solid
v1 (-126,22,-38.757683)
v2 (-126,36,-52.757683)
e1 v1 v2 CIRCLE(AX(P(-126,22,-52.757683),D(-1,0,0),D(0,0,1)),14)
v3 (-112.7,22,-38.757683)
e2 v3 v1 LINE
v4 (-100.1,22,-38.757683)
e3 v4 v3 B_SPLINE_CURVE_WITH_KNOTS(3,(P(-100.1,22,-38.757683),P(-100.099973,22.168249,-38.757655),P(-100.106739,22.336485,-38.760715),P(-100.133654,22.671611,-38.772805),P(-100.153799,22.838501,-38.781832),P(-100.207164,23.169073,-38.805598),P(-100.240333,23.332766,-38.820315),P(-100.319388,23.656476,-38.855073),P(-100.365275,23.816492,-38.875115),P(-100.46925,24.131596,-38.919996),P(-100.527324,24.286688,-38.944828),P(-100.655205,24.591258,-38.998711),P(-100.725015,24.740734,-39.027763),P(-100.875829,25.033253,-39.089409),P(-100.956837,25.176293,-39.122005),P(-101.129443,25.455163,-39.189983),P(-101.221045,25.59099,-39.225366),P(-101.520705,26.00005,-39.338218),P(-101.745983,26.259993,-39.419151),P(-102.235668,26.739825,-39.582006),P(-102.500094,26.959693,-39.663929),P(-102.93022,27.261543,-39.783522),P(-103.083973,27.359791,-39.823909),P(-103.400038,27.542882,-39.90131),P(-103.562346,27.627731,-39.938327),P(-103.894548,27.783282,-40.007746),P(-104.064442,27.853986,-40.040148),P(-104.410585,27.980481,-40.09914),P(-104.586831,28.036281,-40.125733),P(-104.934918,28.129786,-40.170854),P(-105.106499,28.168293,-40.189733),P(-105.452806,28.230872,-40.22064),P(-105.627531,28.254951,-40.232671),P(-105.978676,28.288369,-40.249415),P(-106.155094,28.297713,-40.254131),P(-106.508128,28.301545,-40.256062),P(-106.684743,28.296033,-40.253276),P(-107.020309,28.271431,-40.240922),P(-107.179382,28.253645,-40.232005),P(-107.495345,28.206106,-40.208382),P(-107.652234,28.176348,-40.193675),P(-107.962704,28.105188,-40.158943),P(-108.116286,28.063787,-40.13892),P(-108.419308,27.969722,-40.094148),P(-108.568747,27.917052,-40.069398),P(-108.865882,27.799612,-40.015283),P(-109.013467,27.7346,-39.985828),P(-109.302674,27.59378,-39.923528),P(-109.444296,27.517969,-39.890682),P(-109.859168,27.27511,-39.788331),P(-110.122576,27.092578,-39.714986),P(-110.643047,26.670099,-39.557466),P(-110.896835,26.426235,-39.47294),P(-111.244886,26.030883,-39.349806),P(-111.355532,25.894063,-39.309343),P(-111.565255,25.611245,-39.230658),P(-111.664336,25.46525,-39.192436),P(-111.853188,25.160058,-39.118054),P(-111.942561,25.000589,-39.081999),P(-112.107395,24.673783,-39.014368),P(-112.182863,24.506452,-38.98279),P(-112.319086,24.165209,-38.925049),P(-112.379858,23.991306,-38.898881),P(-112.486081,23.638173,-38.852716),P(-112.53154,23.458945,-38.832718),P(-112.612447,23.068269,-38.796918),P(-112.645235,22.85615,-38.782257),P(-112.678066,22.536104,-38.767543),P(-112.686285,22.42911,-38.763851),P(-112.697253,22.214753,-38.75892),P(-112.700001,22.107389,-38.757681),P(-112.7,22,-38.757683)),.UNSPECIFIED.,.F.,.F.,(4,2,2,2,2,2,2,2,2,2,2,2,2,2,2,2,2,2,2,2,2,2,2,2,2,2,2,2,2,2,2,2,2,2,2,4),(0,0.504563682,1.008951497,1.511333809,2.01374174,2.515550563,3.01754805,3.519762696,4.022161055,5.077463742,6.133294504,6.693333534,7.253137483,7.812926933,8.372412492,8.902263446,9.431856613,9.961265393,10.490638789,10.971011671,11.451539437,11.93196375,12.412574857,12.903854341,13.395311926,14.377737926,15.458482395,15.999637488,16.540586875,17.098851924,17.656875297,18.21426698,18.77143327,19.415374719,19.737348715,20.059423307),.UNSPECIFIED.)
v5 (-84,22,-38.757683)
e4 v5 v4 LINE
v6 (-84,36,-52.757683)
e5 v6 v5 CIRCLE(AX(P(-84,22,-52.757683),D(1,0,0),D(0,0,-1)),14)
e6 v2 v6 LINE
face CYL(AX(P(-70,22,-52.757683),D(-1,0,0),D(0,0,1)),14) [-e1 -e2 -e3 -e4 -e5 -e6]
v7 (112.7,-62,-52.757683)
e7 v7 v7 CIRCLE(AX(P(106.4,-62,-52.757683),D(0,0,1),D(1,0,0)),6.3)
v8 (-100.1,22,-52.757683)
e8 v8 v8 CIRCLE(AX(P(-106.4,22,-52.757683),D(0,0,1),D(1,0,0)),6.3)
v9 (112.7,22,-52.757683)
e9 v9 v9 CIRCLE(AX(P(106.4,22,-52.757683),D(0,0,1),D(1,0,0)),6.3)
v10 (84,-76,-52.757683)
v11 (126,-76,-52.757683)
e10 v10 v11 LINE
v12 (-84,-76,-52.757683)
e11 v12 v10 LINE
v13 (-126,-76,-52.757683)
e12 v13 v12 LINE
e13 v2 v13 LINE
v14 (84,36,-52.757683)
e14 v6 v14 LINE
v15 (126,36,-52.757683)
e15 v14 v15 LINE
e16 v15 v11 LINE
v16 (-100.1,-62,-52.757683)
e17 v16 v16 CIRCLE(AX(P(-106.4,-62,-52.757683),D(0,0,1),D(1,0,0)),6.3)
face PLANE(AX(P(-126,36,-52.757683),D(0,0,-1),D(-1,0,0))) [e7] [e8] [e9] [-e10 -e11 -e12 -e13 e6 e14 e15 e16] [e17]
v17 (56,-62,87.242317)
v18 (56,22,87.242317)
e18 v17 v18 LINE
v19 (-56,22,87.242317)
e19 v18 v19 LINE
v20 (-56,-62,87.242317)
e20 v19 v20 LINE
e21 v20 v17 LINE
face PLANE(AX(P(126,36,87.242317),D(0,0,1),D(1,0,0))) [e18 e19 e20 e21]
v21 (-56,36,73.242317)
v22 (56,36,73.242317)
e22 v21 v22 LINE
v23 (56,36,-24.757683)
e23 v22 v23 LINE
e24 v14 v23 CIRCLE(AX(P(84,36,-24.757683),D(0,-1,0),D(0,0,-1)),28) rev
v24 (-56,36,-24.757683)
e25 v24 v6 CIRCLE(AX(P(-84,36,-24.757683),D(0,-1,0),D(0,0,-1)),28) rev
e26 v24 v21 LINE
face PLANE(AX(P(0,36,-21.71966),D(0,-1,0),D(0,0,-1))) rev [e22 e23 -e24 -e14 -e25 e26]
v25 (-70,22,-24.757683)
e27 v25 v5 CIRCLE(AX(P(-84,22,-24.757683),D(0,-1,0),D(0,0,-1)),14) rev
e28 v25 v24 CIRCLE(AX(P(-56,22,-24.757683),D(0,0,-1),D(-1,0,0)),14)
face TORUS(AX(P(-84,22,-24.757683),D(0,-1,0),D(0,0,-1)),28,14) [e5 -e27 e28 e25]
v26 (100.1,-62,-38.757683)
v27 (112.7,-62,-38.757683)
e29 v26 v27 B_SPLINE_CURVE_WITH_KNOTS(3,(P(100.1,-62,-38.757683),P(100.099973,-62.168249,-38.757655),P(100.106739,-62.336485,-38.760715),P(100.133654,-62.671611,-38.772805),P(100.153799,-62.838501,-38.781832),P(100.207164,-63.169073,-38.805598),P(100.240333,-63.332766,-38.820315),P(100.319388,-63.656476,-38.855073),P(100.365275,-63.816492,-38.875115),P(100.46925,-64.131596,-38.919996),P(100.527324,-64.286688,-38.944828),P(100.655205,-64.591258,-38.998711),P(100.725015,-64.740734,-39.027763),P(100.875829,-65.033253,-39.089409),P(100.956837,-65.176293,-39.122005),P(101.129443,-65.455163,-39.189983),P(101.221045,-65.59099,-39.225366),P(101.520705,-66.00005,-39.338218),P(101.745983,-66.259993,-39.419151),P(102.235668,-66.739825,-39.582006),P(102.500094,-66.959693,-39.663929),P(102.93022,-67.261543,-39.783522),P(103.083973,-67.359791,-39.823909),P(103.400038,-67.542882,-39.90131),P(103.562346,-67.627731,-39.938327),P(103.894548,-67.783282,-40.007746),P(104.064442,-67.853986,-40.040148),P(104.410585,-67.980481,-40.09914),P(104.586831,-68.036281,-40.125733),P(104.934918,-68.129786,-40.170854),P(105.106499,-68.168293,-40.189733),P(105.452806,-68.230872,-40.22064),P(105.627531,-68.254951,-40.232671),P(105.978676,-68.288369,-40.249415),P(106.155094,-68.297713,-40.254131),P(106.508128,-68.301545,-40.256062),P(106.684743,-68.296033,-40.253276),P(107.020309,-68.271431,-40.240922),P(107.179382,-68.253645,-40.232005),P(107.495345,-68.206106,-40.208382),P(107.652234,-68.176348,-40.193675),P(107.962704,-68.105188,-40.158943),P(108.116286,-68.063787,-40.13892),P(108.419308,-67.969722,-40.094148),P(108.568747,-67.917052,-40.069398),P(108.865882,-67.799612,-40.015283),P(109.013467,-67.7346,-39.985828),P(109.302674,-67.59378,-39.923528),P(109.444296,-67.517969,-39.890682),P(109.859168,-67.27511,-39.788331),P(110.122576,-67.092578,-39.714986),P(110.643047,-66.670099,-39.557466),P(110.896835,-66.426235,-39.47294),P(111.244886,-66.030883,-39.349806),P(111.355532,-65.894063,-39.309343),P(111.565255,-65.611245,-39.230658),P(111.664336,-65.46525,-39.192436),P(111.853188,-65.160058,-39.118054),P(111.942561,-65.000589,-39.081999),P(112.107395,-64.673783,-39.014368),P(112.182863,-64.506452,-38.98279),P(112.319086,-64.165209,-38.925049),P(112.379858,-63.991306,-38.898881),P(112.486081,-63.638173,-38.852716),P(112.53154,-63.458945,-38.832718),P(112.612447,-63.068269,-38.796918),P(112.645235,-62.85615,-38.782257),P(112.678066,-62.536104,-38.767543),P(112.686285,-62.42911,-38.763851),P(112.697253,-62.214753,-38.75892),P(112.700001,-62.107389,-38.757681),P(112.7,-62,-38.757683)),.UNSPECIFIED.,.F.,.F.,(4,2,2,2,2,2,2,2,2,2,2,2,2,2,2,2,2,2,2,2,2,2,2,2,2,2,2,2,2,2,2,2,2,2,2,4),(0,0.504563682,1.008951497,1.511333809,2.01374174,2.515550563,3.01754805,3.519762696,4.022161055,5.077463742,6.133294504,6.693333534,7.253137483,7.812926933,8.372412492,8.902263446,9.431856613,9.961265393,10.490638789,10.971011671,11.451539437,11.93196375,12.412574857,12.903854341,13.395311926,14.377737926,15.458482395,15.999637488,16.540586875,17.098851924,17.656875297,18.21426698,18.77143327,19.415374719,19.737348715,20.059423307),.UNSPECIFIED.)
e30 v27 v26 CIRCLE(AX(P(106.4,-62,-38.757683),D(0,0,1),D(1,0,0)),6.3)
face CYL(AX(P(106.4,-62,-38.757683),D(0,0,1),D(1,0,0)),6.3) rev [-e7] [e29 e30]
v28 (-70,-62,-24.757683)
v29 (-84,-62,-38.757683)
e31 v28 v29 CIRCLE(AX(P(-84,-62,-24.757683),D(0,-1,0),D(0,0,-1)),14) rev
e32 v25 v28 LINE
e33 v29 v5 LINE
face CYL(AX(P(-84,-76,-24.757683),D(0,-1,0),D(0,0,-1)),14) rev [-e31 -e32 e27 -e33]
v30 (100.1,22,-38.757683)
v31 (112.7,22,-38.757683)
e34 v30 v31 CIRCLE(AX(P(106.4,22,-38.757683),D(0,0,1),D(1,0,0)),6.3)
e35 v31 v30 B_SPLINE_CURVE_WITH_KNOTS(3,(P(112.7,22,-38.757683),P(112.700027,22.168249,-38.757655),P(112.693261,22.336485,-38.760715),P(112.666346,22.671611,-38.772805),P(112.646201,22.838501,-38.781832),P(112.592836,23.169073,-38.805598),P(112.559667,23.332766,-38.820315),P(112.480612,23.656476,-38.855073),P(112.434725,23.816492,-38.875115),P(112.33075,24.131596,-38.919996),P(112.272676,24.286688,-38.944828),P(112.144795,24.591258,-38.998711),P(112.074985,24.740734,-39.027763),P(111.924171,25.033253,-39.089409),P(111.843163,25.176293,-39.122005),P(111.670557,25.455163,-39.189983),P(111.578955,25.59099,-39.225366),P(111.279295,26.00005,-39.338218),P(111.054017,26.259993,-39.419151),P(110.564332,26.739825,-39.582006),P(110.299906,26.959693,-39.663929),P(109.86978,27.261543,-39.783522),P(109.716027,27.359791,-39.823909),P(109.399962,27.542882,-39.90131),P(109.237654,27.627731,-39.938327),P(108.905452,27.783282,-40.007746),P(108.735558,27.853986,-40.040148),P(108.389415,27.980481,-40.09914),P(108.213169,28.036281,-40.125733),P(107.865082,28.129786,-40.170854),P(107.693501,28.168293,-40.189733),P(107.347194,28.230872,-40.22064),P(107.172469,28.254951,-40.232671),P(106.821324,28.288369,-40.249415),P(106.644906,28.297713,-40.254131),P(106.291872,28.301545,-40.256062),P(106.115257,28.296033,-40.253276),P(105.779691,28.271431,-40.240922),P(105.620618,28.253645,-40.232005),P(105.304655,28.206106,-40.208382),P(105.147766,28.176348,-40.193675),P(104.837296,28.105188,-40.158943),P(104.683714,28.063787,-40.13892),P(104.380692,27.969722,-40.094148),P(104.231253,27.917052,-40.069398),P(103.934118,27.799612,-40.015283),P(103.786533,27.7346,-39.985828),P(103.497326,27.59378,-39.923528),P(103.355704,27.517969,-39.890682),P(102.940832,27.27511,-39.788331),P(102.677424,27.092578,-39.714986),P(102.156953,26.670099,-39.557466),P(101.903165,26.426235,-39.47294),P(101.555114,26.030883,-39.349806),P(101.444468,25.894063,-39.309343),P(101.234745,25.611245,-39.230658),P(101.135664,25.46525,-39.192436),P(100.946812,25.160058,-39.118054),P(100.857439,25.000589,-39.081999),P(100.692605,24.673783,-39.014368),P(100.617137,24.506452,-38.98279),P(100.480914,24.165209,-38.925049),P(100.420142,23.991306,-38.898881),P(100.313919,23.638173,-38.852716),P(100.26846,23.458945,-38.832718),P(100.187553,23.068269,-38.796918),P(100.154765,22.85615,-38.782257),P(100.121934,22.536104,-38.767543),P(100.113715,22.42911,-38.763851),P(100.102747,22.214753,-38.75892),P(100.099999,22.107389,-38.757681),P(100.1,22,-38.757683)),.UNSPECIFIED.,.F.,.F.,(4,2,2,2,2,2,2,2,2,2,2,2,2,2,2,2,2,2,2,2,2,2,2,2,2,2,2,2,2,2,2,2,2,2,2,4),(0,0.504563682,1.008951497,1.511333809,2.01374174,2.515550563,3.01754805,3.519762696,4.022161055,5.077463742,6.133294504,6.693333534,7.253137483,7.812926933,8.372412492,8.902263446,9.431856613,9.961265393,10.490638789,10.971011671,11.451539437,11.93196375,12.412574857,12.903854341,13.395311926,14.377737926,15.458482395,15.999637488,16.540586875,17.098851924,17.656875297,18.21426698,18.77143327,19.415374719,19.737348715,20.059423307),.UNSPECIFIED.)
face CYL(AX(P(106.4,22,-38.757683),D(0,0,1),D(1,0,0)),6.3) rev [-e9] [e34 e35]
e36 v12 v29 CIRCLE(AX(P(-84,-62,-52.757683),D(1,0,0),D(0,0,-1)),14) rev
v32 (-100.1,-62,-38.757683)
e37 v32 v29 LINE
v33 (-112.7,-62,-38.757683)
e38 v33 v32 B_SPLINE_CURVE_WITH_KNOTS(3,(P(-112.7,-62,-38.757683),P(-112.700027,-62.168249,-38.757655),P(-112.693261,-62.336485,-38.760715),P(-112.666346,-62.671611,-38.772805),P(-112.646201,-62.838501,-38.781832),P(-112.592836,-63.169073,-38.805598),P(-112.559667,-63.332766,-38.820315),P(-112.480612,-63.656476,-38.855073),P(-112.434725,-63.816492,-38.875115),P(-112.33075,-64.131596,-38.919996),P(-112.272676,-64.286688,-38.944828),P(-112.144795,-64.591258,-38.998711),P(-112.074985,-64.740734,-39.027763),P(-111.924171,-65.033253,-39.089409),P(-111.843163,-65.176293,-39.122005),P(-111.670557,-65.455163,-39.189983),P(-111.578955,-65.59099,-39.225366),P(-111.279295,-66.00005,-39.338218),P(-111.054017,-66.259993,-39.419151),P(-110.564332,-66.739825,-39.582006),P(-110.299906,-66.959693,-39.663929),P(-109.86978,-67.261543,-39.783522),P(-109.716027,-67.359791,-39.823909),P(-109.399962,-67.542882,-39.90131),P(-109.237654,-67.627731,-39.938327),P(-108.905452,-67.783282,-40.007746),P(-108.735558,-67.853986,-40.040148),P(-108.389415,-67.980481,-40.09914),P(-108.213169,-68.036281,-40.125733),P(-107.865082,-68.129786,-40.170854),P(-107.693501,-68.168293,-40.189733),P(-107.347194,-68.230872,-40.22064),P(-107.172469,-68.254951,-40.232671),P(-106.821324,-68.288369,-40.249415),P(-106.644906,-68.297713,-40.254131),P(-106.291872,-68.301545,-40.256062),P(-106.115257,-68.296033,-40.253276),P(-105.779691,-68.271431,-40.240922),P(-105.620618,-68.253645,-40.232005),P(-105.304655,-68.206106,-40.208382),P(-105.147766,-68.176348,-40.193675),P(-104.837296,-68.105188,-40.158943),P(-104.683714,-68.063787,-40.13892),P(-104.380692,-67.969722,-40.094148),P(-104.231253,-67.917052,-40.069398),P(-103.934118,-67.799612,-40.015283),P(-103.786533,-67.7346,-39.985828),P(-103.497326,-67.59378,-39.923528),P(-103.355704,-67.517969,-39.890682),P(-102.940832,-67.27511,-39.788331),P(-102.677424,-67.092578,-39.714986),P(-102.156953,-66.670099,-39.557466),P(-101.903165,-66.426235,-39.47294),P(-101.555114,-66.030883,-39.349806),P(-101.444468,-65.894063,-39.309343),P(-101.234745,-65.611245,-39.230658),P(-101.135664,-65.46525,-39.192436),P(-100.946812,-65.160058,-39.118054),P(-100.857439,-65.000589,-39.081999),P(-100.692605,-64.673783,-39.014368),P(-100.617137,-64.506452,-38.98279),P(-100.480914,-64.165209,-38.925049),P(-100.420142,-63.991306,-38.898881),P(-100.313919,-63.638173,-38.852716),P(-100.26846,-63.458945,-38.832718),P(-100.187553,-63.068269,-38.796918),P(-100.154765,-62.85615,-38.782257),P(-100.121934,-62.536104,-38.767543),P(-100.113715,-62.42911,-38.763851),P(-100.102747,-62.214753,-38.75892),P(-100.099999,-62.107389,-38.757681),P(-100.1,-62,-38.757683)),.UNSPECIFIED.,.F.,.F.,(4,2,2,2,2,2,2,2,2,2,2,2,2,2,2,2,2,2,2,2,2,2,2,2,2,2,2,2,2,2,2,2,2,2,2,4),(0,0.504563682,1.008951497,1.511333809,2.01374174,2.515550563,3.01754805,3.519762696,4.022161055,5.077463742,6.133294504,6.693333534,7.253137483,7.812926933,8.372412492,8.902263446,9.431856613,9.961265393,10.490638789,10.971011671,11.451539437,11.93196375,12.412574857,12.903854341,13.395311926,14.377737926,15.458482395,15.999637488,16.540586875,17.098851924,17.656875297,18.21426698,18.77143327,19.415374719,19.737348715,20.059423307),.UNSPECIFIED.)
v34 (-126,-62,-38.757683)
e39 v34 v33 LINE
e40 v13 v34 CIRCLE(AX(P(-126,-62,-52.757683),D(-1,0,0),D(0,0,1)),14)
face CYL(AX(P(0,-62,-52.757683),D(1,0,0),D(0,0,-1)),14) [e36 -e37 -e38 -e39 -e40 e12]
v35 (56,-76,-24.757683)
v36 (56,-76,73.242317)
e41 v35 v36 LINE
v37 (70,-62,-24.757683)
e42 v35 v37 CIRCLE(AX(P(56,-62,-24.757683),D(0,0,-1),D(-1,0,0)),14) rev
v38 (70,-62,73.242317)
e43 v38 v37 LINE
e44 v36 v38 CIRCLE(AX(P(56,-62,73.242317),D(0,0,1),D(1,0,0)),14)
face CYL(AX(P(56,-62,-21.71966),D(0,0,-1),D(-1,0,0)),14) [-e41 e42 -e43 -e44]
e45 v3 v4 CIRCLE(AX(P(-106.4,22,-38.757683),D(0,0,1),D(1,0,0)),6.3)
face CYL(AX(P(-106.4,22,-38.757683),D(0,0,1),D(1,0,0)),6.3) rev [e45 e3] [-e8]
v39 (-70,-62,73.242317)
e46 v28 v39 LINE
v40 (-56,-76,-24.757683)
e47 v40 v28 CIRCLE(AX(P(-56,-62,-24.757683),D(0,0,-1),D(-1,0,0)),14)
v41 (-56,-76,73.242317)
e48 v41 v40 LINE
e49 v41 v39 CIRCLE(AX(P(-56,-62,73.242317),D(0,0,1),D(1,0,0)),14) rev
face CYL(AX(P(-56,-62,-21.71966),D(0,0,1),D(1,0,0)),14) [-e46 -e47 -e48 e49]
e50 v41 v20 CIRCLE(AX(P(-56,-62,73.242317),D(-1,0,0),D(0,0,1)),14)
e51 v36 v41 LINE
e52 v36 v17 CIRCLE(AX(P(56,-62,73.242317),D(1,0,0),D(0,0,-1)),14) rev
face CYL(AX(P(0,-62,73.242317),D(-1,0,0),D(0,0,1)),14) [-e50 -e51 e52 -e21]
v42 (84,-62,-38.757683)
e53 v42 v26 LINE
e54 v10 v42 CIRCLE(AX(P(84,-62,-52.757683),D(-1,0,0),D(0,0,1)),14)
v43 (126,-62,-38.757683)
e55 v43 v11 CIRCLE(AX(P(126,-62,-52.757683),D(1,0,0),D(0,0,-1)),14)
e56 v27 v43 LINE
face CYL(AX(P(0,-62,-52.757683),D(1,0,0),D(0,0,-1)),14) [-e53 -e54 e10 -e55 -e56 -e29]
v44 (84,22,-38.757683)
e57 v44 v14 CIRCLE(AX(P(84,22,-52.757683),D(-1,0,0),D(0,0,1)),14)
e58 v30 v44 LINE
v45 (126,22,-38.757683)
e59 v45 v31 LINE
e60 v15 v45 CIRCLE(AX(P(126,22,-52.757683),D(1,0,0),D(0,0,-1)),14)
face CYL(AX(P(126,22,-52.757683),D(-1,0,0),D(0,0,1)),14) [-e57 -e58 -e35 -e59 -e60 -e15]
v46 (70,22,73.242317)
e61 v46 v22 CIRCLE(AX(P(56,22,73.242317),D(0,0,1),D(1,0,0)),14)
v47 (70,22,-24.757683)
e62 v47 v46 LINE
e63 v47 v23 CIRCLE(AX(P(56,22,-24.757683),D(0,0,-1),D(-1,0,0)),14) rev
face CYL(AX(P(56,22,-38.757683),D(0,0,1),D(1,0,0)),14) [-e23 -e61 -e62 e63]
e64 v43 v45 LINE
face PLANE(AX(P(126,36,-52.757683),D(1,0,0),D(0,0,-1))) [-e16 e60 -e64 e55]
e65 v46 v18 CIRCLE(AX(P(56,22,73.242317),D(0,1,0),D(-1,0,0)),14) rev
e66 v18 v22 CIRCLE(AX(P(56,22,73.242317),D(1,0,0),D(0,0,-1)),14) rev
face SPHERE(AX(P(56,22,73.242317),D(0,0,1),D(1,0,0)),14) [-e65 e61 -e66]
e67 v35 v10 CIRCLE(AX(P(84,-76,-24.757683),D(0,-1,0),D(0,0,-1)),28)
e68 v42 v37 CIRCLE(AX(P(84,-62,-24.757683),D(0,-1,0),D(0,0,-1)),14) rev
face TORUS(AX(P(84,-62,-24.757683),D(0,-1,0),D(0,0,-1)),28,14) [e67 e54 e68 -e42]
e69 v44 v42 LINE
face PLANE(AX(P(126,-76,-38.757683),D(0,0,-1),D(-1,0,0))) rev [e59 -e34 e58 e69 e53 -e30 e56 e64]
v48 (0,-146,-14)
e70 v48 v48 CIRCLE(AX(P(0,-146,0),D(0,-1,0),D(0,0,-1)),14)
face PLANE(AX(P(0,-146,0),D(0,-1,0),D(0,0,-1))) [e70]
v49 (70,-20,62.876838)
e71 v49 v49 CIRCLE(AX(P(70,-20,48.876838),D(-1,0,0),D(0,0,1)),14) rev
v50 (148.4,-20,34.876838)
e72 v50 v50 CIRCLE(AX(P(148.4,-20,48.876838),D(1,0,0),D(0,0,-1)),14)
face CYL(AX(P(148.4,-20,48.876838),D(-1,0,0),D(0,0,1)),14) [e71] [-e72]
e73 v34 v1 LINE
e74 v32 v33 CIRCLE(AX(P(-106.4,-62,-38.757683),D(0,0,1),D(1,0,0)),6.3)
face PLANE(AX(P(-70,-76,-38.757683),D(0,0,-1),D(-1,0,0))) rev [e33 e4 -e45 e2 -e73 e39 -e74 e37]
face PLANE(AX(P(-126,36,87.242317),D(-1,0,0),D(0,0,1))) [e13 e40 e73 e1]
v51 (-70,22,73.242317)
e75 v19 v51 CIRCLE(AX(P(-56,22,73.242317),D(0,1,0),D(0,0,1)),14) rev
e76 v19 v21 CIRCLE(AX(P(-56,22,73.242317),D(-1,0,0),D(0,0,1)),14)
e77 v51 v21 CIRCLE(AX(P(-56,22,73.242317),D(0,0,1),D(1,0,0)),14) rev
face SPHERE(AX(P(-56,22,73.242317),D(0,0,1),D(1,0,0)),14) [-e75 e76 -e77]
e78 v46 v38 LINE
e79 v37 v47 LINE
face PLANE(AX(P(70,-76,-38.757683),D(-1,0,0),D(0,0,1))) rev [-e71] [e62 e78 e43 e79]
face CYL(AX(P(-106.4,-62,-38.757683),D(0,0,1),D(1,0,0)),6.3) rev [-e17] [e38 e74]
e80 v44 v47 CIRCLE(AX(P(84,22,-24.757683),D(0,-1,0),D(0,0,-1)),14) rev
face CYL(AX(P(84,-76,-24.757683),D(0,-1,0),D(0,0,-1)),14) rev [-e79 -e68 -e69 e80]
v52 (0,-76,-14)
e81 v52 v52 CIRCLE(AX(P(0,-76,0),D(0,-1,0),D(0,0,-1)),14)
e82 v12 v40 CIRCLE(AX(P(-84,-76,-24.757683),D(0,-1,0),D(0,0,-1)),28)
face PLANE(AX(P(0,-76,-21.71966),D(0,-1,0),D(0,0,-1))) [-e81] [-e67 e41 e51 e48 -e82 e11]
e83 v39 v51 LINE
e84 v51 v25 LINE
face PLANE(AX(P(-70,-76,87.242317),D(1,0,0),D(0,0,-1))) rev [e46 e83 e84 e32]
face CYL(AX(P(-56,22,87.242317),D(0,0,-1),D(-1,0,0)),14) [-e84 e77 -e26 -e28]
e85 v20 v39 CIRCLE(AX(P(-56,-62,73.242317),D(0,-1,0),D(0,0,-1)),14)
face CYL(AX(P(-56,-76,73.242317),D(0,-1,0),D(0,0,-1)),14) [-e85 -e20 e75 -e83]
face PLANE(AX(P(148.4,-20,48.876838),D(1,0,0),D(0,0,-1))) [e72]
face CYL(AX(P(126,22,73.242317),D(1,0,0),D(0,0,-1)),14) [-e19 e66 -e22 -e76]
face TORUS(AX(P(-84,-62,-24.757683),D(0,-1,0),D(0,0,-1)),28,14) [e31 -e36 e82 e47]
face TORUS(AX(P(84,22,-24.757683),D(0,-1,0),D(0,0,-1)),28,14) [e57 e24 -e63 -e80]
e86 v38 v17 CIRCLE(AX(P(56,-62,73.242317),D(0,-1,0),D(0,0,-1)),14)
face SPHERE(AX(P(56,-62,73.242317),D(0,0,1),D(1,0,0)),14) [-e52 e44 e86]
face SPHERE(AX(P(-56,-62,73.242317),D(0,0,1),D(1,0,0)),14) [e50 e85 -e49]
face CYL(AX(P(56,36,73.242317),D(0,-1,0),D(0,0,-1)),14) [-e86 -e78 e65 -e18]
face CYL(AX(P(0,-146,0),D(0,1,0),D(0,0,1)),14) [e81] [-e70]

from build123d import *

# Parameters (mm, degrees)
SKETCH1_W                  = 90
SKETCH1_H                  = 50
BOSS_EXTRUDE1_DEPTH        = 40
SKETCH2_W                  = 20
SKETCH2_H                  = 45
CUT_EXTRUDE1_DEPTH         = 72.689445415
SKETCH3_W                  = 20
SKETCH3_H                  = 45
CUT_EXTRUDE2_DEPTH         = 72.689445415
F_4_5_4_5_DIAMETER_HOLE1_D = 4.5
FILLET1_R                  = 5
SCALE1_SCALE               = 2.8
SKETCH12_R                 = 14
BOSS_EXTRUDE2_DEPTH        = 70
SKETCH13_R                 = 14
BOSS_EXTRUDE3_DEPTH        = 78.4


with BuildPart() as part:
    # Sketch1 → Boss-Extrude1 (new body)
    with BuildSketch(Plane.XZ.offset(40)):
        with Locations((0, 13.914991763)):
            Rectangle(SKETCH1_W, SKETCH1_H)
    extrude(amount=-BOSS_EXTRUDE1_DEPTH)

    # Sketch2 → Cut-Extrude1 (cut, through all)
    with BuildSketch(Plane(origin=(0, 0, 0), x_dir=(-1, 0, 0), z_dir=(0, 1, 0))):
        with Locations((35, 16.414991763)):
            Rectangle(SKETCH2_W, SKETCH2_H)
    extrude(amount=-CUT_EXTRUDE1_DEPTH, mode=Mode.SUBTRACT)

    # Sketch3 → Cut-Extrude2 (cut, through all)
    with BuildSketch(Plane(origin=(0, 0, 0), x_dir=(-1, 0, 0), z_dir=(0, 1, 0))):
        with Locations((-35, 16.414991763)):
            Rectangle(SKETCH3_W, SKETCH3_H)
    extrude(amount=-CUT_EXTRUDE2_DEPTH, mode=Mode.SUBTRACT)

    # Ø4.5 (4.5) Diameter Hole1 (through all)
    with Locations(Plane.XY.offset(-6.085008237)):
        with Locations((38, -5), (-38, -35), (-38, -5), (38, -35)):
            Hole(F_4_5_4_5_DIAMETER_HOLE1_D / 2)

    # Fillet1
    # the kernel refuses this fillet: 5 mm, written as the material it adds along each edge
    with BuildSketch(Plane(origin=(-25, 0, -6.085008237), x_dir=(0, 0, 1), z_dir=(0, -1, 0))) as fillet1_piece_1:
        with BuildLine():
            CenterArc((FILLET1_R, FILLET1_R), FILLET1_R, 180, 90)
            Line((0, FILLET1_R), (0, 0))
            Line((0, 0), (FILLET1_R, 0))
        make_face()
    extrude(amount=40)
    with BuildSketch(Plane(origin=(25, 0, -6.085008237), x_dir=(0, 0, 1), z_dir=(0, -1, 0))) as fillet1_piece_2:
        with BuildLine():
            CenterArc((FILLET1_R, -FILLET1_R), FILLET1_R, 90, 90)
            Line((0, -FILLET1_R), (0, 0))
            Line((0, 0), (FILLET1_R, 0))
        make_face()
    extrude(amount=40)
    # the kernel refuses this fillet: 5 mm, written as the material it takes off along each edge
    with BuildSketch(Plane(origin=(-25, 12.5, 38.914991763), x_dir=(1, 0, 0), z_dir=(0, -1, 0))) as fillet1_2_piece_1:
        with BuildLine():
            CenterArc((FILLET1_R, -FILLET1_R), FILLET1_R, 90, 90)
            Line((0, -FILLET1_R), (0, 0))
            Line((0, 0), (FILLET1_R, 0))
        make_face()
    extrude(amount=65, mode=Mode.SUBTRACT)
    with BuildSketch(Plane(origin=(37.5, 0, 38.914991763), x_dir=(0, -1, 0), z_dir=(-1, 0, 0))) as fillet1_2_piece_2:
        with BuildLine():
            CenterArc((FILLET1_R, -FILLET1_R), FILLET1_R, 90, 90)
            Line((0, -FILLET1_R), (0, 0))
            Line((0, 0), (FILLET1_R, 0))
        make_face()
    extrude(amount=75, mode=Mode.SUBTRACT)
    with BuildSketch(Plane(origin=(37.5, -40, 38.914991763), x_dir=(0, 1, 0), z_dir=(-1, 0, 0))) as fillet1_2_piece_3:
        with BuildLine():
            CenterArc((FILLET1_R, FILLET1_R), FILLET1_R, 180, 90)
            Line((0, FILLET1_R), (0, 0))
            Line((0, 0), (FILLET1_R, 0))
        make_face()
    extrude(amount=75, mode=Mode.SUBTRACT)
    with BuildSketch(Plane(origin=(25, 12.5, 38.914991763), x_dir=(-1, 0, 0), z_dir=(0, -1, 0))) as fillet1_2_piece_4:
        with BuildLine():
            CenterArc((FILLET1_R, FILLET1_R), FILLET1_R, 180, 90)
            Line((0, FILLET1_R), (0, 0))
            Line((0, 0), (FILLET1_R, 0))
        make_face()
    extrude(amount=65, mode=Mode.SUBTRACT)
    # the kernel refuses this fillet: 5 mm, written as the material it takes off along each edge
    with BuildSketch(Plane(origin=(20, -35, 33.914991763), x_dir=(1, 0, 0), z_dir=(0, -1, 0))) as fillet1_3_piece_1_section:
        Polygon((0, 0), (FILLET1_R, 0), (FILLET1_R, FILLET1_R), (0, FILLET1_R), align=None)
    fillet1_3_piece_1 = extrude(amount=FILLET1_R, mode=Mode.PRIVATE)
    fillet1_3_piece_1 = fillet1_3_piece_1 - Plane(origin=(20, -35, 33.914991763), x_dir=(-0.7071067811865475, 0, -0.7071067811865475), z_dir=(0, -1, 0)) * Sphere(FILLET1_R, mode=Mode.PRIVATE)
    add(fillet1_3_piece_1, mode=Mode.SUBTRACT)
    with BuildSketch(Plane(origin=(-20, -35, 33.914991763), x_dir=(-1, 0, 0), z_dir=(0, -1, 0))) as fillet1_3_piece_2_section:
        Polygon((0, 0), (FILLET1_R, 0), (FILLET1_R, -FILLET1_R), (0, -FILLET1_R), align=None)
    fillet1_3_piece_2 = extrude(amount=FILLET1_R, mode=Mode.PRIVATE)
    fillet1_3_piece_2 = fillet1_3_piece_2 - Plane(origin=(-20, -35, 33.914991763), x_dir=(0.7071067811865476, 0, -0.7071067811865475), z_dir=(0, -1, 0)) * Sphere(FILLET1_R, mode=Mode.PRIVATE)
    add(fillet1_3_piece_2, mode=Mode.SUBTRACT)
    with BuildSketch(Plane(origin=(-20, -5, 33.914991763), x_dir=(0, 1, 0), z_dir=(-1, 0, 0))) as fillet1_3_piece_3_section:
        Polygon((0, 0), (FILLET1_R, 0), (FILLET1_R, -FILLET1_R), (0, -FILLET1_R), align=None)
    fillet1_3_piece_3 = extrude(amount=FILLET1_R, mode=Mode.PRIVATE)
    fillet1_3_piece_3 = fillet1_3_piece_3 - Plane(origin=(-20, -5, 33.914991763), x_dir=(0, -0.7071067811865475, -0.7071067811865475), z_dir=(-1, 0, 0)) * Sphere(FILLET1_R, mode=Mode.PRIVATE)
    add(fillet1_3_piece_3, mode=Mode.SUBTRACT)
    with BuildSketch(Plane(origin=(20, -5, 33.914991763), x_dir=(1, 0, 0), z_dir=(0, 1, 0))) as fillet1_3_piece_4_section:
        Polygon((0, 0), (FILLET1_R, 0), (FILLET1_R, -FILLET1_R), (0, -FILLET1_R), align=None)
    fillet1_3_piece_4 = extrude(amount=FILLET1_R, mode=Mode.PRIVATE)
    fillet1_3_piece_4 = fillet1_3_piece_4 - Plane(origin=(20, -5, 33.914991763), x_dir=(-0.7071067811865475, 0, -0.7071067811865475), z_dir=(0, 1, 0)) * Sphere(FILLET1_R, mode=Mode.PRIVATE)
    add(fillet1_3_piece_4, mode=Mode.SUBTRACT)
    with BuildSketch(Plane(origin=(-57.5, -40, -6.085008237), x_dir=(0, 0, -1), z_dir=(1, 0, 0)), Plane(origin=(-30, 0, -6.085008237), x_dir=(0, 0, -1), z_dir=(-1, 0, 0)), Plane(origin=(57.5, 0, -6.085008237), x_dir=(0, 0, -1), z_dir=(-1, 0, 0)), Plane(origin=(30, -40, -6.085008237), x_dir=(0, 0, -1), z_dir=(1, 0, 0))) as fillet1_3_piece_5:
        with BuildLine():
            CenterArc((FILLET1_R, FILLET1_R), FILLET1_R, 180, 90)
            Line((0, FILLET1_R), (0, 0))
            Line((0, 0), (FILLET1_R, 0))
        make_face()
    extrude(amount=27.5, mode=Mode.SUBTRACT)
    with BuildSketch(Plane(origin=(25, 0, -1.085008237), x_dir=(-1, 0, 0), z_dir=(0, 0, 1)), Plane(origin=(-25, -40, -1.085008237), x_dir=(1, 0, 0), z_dir=(0, 0, 1)), Plane(origin=(25, -40, 33.914991763), x_dir=(-1, 0, 0), z_dir=(0, 0, -1))) as fillet1_3_piece_6:
        with BuildLine():
            CenterArc((FILLET1_R, FILLET1_R), FILLET1_R, 180, 90)
            Line((0, FILLET1_R), (0, 0))
            Line((0, 0), (FILLET1_R, 0))
        make_face()
    extrude(amount=35, mode=Mode.SUBTRACT)
    with BuildSketch(Plane(origin=(-25, 0, 33.914991763), x_dir=(0, -1, 0), z_dir=(0, 0, -1))) as fillet1_3_piece_7:
        with BuildLine():
            CenterArc((FILLET1_R, -FILLET1_R), FILLET1_R, 90, 90)
            Line((0, -FILLET1_R), (0, 0))
            Line((0, 0), (FILLET1_R, 0))
        make_face()
    extrude(amount=35, mode=Mode.SUBTRACT)
    with BuildSketch(Plane(origin=(30, -40, -1.085008237), x_dir=(-1, 0, 0), z_dir=(0, 0, 1))) as fillet1_3_piece_8:
        with BuildLine():
            CenterArc((5 + FILLET1_R, -FILLET1_R), FILLET1_R, 90, 90)
            Line((5, -FILLET1_R), (5, 0))
            Line((5, 0), (5 + FILLET1_R, 0))
        make_face()
    revolve(axis=Axis((30, -40, -1.085008237), (0, -1, 0)), revolution_arc=90, mode=Mode.SUBTRACT)
    with BuildSketch(Plane(origin=(-30, -40, -1.085008237), x_dir=(1, 0, 0), z_dir=(0, 0, 1))) as fillet1_3_piece_9:
        with BuildLine():
            CenterArc((5 + FILLET1_R, FILLET1_R), FILLET1_R, 180, 90)
            Line((5, FILLET1_R), (5, 0))
            Line((5, 0), (5 + FILLET1_R, 0))
        make_face()
    revolve(axis=Axis((-30, -40, -1.085008237), (0, 1, 0)), revolution_arc=90, mode=Mode.SUBTRACT)
    with BuildSketch(Plane(origin=(-30, 0, -1.085008237), x_dir=(1, 0, 0), z_dir=(0, 0, 1))) as fillet1_3_piece_10:
        with BuildLine():
            CenterArc((5 + FILLET1_R, -FILLET1_R), FILLET1_R, 90, 90)
            Line((5, -FILLET1_R), (5, 0))
            Line((5, 0), (5 + FILLET1_R, 0))
        make_face()
    revolve(axis=Axis((-30, 0, -1.085008237), (0, 1, 0)), revolution_arc=90, mode=Mode.SUBTRACT)
    with BuildSketch(Plane(origin=(30, 0, -1.085008237), x_dir=(-1, 0, 0), z_dir=(0, 0, 1))) as fillet1_3_piece_11:
        with BuildLine():
            CenterArc((5 + FILLET1_R, FILLET1_R), FILLET1_R, 180, 90)
            Line((5, FILLET1_R), (5, 0))
            Line((5, 0), (5 + FILLET1_R, 0))
        make_face()
    revolve(axis=Axis((30, 0, -1.085008237), (0, -1, 0)), revolution_arc=90, mode=Mode.SUBTRACT)


with BuildPart() as part_1:
    # Scale1: scaled about (-1e-09, -20.000000005, 12.066484994)
    add(part.part.scale(SCALE1_SCALE).moved(Location((2e-09, 36.000000009, -21.719672989))))

    # Sketch12 → Boss-Extrude2 (add)
    with BuildSketch(Plane.XZ.offset(76)):
        with Locations(Location((0, 0, 0), (0, 0, 270))):
            Circle(SKETCH12_R)
    extrude(amount=BOSS_EXTRUDE2_DEPTH)

    # Sketch13 → Boss-Extrude3 (add)
    with BuildSketch(Plane(origin=(70, 0, 0), x_dir=(0, 0, -1), z_dir=(1, 0, 0))):
        with Locations(Location((-48.876838431, -20, 0), (0, 0, 180))):
            Circle(SKETCH13_R)
    extrude(amount=BOSS_EXTRUDE3_DEPTH)


solid = part_1.part
